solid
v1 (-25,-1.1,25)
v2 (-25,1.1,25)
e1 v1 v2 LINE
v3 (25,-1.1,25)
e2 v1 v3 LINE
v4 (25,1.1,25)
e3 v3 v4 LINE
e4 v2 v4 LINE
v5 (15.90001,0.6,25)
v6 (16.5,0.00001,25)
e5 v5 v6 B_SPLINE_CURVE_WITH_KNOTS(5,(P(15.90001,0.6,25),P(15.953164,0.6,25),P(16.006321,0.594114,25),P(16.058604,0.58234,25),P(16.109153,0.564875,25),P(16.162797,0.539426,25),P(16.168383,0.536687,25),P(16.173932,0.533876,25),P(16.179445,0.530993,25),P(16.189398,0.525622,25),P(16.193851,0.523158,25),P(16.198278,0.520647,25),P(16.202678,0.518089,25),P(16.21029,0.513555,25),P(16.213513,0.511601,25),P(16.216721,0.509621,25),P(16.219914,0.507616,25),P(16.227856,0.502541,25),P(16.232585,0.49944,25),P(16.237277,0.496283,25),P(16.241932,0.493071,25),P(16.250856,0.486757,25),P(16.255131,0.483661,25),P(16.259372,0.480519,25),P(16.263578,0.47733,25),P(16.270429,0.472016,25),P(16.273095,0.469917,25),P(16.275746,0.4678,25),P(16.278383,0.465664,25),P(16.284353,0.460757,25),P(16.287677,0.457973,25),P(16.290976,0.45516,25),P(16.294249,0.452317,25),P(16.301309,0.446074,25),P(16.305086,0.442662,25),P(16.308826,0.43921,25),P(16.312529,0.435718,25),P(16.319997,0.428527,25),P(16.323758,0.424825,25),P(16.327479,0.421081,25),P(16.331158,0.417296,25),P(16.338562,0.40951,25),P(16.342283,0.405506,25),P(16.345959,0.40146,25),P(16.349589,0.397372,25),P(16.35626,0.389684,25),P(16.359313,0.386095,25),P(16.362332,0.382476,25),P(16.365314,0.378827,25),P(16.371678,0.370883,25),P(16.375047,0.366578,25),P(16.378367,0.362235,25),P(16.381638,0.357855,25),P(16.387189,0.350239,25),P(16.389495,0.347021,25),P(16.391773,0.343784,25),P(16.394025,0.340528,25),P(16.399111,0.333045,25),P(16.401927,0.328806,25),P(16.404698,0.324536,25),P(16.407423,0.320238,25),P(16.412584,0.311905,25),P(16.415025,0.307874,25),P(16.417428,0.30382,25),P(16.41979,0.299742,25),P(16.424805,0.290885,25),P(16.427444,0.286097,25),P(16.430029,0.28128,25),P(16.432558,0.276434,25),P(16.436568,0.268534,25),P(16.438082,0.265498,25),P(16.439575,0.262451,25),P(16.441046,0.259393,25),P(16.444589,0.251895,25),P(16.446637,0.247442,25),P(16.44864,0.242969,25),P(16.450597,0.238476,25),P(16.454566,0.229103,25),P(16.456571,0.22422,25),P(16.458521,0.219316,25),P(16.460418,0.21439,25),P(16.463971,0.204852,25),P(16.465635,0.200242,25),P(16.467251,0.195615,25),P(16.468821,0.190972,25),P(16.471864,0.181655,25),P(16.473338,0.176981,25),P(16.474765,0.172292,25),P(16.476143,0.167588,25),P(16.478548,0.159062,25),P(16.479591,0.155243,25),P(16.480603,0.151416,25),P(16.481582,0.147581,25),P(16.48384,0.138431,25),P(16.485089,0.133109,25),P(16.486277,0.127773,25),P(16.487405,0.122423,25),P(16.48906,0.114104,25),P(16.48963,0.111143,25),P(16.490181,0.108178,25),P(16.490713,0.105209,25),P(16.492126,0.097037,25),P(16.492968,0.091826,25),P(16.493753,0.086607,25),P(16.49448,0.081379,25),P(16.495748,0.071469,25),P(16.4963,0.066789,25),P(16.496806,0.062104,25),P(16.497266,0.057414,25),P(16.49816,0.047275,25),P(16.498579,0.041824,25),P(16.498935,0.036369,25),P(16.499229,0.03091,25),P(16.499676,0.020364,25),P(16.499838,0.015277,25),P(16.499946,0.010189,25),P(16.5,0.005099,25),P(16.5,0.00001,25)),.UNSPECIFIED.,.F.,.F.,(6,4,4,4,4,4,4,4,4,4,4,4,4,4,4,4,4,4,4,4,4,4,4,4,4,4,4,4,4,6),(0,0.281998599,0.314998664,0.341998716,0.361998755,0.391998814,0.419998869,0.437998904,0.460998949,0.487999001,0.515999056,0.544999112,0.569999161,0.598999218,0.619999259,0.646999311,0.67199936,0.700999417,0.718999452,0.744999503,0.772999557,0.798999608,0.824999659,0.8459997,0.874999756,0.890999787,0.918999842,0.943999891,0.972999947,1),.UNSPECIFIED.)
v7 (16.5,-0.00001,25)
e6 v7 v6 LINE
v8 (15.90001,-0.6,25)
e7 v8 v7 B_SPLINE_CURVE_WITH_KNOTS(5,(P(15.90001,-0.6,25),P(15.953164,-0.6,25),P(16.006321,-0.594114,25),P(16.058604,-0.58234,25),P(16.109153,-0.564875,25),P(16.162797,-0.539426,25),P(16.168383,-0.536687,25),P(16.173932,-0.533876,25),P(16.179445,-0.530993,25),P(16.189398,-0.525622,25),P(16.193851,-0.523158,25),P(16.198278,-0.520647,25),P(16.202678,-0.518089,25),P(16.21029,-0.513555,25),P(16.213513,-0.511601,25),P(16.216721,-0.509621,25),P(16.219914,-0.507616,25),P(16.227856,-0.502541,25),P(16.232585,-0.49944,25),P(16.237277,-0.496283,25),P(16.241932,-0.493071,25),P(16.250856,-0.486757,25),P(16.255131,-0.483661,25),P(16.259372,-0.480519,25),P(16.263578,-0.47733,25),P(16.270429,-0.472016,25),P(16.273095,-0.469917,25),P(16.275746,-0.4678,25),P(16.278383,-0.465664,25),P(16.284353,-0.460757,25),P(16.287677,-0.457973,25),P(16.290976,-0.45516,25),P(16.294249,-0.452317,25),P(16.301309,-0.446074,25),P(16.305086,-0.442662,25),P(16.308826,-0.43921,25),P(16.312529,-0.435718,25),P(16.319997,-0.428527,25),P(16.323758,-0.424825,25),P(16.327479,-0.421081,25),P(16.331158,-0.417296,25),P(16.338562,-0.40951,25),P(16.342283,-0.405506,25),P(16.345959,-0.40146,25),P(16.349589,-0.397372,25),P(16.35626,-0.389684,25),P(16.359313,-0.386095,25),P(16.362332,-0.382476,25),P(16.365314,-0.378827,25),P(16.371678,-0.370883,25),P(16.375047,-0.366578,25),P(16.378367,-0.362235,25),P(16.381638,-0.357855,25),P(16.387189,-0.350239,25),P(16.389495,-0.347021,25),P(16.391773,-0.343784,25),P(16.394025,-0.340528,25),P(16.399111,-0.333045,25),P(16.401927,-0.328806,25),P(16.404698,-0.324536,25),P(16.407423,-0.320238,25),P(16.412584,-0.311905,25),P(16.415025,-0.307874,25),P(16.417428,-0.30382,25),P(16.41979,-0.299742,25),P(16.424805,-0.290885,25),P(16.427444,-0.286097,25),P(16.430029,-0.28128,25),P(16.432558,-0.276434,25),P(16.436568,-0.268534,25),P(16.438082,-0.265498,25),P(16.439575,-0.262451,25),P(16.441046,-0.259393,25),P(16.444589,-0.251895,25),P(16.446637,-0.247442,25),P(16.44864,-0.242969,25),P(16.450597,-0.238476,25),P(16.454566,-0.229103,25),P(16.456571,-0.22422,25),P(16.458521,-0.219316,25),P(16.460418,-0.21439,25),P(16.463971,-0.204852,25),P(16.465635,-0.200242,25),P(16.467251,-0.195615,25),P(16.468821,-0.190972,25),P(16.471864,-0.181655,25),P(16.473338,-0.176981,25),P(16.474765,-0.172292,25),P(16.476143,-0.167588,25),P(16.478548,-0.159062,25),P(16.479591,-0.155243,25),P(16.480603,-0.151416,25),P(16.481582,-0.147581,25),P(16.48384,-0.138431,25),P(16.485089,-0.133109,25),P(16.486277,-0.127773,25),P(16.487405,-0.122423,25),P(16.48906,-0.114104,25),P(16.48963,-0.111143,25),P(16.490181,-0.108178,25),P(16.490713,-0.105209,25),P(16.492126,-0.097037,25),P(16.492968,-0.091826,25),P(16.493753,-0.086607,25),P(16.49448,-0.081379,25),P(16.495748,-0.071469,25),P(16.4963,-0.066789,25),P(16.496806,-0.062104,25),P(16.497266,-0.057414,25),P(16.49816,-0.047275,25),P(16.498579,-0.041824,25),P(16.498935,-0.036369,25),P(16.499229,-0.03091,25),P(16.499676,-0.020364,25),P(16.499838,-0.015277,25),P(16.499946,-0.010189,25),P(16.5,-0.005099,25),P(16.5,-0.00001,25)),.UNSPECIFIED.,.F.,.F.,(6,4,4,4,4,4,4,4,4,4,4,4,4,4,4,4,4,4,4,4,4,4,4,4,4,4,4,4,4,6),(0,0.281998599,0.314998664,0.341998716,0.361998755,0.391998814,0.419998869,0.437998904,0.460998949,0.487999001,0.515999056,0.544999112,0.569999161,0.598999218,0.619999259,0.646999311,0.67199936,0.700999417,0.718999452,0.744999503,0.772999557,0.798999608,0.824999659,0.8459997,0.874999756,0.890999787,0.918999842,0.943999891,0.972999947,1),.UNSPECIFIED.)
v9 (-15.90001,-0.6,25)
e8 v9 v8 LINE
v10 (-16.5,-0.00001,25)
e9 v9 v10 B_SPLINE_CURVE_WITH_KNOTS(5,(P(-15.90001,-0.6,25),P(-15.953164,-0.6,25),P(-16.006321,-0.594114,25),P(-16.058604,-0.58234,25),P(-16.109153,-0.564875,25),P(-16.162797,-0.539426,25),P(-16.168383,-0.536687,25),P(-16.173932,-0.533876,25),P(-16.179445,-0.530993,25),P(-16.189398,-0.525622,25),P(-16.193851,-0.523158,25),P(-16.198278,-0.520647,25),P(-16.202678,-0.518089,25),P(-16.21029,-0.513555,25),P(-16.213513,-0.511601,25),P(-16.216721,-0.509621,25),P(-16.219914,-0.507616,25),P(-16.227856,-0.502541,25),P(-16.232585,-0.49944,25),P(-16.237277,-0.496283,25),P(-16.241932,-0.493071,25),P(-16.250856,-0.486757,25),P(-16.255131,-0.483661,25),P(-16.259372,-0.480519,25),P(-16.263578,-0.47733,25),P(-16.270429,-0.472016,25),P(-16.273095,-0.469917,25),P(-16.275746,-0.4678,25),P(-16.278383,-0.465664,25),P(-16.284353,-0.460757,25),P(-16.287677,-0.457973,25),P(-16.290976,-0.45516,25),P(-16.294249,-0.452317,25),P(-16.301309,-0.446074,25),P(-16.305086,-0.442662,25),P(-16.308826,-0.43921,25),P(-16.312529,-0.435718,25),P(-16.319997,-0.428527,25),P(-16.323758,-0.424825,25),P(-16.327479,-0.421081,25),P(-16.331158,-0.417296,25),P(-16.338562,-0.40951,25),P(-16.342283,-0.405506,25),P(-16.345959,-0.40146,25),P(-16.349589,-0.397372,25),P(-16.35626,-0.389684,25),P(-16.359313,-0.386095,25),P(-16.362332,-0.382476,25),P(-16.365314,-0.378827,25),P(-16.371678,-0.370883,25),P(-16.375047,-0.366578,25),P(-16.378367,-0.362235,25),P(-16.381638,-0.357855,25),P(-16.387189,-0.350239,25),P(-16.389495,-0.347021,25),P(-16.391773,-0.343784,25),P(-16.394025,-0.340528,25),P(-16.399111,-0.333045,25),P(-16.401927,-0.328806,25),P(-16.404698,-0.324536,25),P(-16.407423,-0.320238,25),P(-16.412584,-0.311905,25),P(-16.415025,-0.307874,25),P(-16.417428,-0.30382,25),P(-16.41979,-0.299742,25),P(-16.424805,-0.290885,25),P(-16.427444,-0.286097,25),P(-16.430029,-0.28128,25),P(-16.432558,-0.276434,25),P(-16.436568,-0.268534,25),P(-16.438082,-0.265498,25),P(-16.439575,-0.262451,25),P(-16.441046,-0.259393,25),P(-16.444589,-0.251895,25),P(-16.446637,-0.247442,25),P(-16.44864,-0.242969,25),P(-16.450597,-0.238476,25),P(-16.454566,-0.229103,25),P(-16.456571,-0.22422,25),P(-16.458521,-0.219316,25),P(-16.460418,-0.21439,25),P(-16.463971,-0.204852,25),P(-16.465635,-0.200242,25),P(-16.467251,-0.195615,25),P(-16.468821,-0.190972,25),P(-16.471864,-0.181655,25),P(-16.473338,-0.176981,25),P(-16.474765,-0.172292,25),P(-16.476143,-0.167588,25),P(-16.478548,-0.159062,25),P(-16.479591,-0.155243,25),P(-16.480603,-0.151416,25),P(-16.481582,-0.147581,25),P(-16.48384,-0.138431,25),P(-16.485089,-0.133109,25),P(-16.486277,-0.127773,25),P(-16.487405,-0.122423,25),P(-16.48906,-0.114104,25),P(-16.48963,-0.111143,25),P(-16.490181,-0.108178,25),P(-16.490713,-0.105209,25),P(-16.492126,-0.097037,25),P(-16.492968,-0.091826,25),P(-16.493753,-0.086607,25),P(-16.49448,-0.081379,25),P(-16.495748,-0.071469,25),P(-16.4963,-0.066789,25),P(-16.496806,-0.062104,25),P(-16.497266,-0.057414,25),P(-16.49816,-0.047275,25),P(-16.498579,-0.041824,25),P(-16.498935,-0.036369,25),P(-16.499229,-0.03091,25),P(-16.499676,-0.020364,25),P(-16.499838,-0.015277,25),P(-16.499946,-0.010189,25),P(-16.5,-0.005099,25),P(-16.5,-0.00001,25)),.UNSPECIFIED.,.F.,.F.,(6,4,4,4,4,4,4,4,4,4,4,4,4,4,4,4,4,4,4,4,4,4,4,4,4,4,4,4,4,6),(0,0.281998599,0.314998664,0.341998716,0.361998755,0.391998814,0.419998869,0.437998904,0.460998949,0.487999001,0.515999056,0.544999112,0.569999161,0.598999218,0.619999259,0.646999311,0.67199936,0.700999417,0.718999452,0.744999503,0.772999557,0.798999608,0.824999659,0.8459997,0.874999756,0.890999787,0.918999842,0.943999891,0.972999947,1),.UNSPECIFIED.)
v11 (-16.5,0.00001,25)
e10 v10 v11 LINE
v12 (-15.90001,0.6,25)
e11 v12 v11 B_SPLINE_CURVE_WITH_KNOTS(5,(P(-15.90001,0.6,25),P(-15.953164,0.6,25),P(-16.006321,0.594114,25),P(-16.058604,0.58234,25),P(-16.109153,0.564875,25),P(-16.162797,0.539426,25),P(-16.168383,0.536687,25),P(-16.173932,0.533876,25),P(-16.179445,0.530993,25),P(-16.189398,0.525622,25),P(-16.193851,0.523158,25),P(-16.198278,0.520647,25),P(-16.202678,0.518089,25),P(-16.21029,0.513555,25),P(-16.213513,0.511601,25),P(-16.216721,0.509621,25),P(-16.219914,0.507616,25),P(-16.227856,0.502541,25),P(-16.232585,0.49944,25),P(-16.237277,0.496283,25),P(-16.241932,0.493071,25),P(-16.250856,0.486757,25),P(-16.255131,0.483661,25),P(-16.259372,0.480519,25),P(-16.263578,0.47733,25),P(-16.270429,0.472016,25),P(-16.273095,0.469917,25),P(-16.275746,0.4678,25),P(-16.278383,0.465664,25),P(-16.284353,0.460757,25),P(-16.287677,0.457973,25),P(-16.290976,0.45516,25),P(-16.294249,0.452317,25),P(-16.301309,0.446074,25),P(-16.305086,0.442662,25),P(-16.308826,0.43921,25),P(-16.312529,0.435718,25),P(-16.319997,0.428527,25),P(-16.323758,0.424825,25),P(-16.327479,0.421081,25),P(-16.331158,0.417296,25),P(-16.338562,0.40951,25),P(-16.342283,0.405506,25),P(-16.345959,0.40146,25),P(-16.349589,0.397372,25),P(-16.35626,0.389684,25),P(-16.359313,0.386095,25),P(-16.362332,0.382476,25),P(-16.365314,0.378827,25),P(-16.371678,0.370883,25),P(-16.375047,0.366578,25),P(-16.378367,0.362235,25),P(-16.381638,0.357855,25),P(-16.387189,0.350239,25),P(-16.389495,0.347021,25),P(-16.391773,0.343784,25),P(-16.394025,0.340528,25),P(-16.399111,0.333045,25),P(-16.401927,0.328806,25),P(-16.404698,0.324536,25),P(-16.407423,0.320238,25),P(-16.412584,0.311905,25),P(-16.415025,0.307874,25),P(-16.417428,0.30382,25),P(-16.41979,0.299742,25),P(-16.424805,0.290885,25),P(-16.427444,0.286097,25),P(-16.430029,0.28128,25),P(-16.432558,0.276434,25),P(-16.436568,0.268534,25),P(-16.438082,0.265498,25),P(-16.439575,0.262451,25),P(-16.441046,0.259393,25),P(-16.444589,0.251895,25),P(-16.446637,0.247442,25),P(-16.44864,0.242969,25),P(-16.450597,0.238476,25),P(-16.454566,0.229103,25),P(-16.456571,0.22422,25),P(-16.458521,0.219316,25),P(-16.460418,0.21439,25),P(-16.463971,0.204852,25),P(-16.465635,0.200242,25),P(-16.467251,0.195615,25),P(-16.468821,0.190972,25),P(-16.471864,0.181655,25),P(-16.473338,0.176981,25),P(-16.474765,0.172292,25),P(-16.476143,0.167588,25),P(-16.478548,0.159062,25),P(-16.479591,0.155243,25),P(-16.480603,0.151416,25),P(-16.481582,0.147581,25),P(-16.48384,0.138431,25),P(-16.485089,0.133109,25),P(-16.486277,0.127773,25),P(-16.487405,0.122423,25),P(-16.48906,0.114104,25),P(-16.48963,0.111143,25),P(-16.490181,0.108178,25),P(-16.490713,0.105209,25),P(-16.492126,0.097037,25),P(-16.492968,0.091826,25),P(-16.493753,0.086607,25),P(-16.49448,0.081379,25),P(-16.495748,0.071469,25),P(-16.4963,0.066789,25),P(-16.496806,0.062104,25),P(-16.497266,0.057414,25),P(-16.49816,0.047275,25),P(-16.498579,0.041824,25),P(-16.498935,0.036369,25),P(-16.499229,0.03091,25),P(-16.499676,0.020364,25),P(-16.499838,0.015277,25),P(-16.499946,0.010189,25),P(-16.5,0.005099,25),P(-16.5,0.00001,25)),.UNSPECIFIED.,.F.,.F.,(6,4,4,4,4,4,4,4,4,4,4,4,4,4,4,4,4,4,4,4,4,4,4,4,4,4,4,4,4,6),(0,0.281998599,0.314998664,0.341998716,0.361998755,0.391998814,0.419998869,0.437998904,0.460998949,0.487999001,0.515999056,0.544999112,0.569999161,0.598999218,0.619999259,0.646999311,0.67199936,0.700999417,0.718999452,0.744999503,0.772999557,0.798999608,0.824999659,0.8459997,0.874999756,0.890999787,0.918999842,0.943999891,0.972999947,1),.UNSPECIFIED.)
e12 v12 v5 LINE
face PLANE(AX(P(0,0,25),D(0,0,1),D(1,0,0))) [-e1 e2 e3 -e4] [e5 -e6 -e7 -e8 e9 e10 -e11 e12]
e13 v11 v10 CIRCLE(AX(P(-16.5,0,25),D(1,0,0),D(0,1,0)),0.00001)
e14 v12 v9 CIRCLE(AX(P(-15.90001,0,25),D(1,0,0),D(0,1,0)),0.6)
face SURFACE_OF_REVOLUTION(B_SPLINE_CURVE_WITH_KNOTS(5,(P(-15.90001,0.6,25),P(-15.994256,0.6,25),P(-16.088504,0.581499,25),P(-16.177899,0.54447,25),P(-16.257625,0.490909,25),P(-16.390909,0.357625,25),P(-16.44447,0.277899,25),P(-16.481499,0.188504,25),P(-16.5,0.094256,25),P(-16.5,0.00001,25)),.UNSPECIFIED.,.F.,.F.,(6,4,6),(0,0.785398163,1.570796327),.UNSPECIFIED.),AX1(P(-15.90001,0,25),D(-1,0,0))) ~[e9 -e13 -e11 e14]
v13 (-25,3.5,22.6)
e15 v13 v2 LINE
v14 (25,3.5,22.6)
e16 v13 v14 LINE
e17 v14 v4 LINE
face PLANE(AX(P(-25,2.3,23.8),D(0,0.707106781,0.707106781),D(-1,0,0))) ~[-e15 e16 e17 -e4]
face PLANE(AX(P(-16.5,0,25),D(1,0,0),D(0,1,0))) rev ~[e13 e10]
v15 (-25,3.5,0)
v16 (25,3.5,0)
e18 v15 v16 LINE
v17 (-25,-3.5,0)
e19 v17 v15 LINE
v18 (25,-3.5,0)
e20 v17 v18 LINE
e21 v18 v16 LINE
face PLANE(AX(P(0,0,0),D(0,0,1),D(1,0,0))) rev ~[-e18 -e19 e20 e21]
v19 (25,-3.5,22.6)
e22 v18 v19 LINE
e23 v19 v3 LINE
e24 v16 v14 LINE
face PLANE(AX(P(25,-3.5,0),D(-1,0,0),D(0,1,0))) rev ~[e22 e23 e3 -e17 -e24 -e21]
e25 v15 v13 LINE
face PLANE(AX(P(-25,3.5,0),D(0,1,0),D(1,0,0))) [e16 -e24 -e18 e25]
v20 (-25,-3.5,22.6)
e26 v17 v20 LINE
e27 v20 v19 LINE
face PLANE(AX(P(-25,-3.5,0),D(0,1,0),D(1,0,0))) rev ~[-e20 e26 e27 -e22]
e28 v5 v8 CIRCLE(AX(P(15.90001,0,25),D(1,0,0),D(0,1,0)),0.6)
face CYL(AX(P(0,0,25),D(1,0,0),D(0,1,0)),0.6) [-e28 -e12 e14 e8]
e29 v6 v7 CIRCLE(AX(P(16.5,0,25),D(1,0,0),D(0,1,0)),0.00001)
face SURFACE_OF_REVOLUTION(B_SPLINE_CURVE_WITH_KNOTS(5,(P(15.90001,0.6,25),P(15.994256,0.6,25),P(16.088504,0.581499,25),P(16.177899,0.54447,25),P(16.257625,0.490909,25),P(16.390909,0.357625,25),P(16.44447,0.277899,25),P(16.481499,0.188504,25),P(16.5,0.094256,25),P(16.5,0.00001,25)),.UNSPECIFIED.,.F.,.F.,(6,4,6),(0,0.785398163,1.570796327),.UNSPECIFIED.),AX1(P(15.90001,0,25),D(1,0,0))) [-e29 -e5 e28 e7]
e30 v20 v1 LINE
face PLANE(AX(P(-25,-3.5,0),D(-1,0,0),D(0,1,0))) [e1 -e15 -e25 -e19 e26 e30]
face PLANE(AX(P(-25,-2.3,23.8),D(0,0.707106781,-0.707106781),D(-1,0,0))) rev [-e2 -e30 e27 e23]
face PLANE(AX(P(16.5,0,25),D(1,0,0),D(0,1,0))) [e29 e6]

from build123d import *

# Parameters (mm, degrees)
F0_W     = 50
F0_H     = 7
F1_DEPTH = 25
F2_SIZE  = 2.4
F3_R     = 0.6
F4_DEPTH = 16.5
F5_R     = 0.59999


# Not quite as in the source:
# - a fillet or chamfer is up to 0.001 mm smaller than in the source, because OpenCascade refuses the exact size


with BuildPart() as f1:
    # F0 (on Top) → F1 (new body)
    with BuildSketch(Plane.XY):
        Rectangle(F0_W, F0_H)
    extrude(amount=F1_DEPTH)

    # F2
    f2_edges = [f1.edges().sort_by_distance(p)[0] for p in [
        (0, -3.5, 25),
        (0, 3.5, 25),
    ]]
    chamfer(f2_edges, length=F2_SIZE)

    # F3 (on Right) → F4 (join, symmetric)
    with BuildSketch(Plane.YZ):
        with Locations((0, 25)):
            Circle(F3_R)
    extrude(amount=F4_DEPTH, both=True)

    # F5 (radius 0.6 in the source; OpenCascade refuses exactly that, so slightly less here)
    f5_edges = [f1.edges().sort_by_distance(p)[0] for p in [
        (16.5, 0, 25.6),
        (-16.5, 0, 25.6),
    ]]
    fillet(f5_edges, radius=F5_R)


solid = f1.part
